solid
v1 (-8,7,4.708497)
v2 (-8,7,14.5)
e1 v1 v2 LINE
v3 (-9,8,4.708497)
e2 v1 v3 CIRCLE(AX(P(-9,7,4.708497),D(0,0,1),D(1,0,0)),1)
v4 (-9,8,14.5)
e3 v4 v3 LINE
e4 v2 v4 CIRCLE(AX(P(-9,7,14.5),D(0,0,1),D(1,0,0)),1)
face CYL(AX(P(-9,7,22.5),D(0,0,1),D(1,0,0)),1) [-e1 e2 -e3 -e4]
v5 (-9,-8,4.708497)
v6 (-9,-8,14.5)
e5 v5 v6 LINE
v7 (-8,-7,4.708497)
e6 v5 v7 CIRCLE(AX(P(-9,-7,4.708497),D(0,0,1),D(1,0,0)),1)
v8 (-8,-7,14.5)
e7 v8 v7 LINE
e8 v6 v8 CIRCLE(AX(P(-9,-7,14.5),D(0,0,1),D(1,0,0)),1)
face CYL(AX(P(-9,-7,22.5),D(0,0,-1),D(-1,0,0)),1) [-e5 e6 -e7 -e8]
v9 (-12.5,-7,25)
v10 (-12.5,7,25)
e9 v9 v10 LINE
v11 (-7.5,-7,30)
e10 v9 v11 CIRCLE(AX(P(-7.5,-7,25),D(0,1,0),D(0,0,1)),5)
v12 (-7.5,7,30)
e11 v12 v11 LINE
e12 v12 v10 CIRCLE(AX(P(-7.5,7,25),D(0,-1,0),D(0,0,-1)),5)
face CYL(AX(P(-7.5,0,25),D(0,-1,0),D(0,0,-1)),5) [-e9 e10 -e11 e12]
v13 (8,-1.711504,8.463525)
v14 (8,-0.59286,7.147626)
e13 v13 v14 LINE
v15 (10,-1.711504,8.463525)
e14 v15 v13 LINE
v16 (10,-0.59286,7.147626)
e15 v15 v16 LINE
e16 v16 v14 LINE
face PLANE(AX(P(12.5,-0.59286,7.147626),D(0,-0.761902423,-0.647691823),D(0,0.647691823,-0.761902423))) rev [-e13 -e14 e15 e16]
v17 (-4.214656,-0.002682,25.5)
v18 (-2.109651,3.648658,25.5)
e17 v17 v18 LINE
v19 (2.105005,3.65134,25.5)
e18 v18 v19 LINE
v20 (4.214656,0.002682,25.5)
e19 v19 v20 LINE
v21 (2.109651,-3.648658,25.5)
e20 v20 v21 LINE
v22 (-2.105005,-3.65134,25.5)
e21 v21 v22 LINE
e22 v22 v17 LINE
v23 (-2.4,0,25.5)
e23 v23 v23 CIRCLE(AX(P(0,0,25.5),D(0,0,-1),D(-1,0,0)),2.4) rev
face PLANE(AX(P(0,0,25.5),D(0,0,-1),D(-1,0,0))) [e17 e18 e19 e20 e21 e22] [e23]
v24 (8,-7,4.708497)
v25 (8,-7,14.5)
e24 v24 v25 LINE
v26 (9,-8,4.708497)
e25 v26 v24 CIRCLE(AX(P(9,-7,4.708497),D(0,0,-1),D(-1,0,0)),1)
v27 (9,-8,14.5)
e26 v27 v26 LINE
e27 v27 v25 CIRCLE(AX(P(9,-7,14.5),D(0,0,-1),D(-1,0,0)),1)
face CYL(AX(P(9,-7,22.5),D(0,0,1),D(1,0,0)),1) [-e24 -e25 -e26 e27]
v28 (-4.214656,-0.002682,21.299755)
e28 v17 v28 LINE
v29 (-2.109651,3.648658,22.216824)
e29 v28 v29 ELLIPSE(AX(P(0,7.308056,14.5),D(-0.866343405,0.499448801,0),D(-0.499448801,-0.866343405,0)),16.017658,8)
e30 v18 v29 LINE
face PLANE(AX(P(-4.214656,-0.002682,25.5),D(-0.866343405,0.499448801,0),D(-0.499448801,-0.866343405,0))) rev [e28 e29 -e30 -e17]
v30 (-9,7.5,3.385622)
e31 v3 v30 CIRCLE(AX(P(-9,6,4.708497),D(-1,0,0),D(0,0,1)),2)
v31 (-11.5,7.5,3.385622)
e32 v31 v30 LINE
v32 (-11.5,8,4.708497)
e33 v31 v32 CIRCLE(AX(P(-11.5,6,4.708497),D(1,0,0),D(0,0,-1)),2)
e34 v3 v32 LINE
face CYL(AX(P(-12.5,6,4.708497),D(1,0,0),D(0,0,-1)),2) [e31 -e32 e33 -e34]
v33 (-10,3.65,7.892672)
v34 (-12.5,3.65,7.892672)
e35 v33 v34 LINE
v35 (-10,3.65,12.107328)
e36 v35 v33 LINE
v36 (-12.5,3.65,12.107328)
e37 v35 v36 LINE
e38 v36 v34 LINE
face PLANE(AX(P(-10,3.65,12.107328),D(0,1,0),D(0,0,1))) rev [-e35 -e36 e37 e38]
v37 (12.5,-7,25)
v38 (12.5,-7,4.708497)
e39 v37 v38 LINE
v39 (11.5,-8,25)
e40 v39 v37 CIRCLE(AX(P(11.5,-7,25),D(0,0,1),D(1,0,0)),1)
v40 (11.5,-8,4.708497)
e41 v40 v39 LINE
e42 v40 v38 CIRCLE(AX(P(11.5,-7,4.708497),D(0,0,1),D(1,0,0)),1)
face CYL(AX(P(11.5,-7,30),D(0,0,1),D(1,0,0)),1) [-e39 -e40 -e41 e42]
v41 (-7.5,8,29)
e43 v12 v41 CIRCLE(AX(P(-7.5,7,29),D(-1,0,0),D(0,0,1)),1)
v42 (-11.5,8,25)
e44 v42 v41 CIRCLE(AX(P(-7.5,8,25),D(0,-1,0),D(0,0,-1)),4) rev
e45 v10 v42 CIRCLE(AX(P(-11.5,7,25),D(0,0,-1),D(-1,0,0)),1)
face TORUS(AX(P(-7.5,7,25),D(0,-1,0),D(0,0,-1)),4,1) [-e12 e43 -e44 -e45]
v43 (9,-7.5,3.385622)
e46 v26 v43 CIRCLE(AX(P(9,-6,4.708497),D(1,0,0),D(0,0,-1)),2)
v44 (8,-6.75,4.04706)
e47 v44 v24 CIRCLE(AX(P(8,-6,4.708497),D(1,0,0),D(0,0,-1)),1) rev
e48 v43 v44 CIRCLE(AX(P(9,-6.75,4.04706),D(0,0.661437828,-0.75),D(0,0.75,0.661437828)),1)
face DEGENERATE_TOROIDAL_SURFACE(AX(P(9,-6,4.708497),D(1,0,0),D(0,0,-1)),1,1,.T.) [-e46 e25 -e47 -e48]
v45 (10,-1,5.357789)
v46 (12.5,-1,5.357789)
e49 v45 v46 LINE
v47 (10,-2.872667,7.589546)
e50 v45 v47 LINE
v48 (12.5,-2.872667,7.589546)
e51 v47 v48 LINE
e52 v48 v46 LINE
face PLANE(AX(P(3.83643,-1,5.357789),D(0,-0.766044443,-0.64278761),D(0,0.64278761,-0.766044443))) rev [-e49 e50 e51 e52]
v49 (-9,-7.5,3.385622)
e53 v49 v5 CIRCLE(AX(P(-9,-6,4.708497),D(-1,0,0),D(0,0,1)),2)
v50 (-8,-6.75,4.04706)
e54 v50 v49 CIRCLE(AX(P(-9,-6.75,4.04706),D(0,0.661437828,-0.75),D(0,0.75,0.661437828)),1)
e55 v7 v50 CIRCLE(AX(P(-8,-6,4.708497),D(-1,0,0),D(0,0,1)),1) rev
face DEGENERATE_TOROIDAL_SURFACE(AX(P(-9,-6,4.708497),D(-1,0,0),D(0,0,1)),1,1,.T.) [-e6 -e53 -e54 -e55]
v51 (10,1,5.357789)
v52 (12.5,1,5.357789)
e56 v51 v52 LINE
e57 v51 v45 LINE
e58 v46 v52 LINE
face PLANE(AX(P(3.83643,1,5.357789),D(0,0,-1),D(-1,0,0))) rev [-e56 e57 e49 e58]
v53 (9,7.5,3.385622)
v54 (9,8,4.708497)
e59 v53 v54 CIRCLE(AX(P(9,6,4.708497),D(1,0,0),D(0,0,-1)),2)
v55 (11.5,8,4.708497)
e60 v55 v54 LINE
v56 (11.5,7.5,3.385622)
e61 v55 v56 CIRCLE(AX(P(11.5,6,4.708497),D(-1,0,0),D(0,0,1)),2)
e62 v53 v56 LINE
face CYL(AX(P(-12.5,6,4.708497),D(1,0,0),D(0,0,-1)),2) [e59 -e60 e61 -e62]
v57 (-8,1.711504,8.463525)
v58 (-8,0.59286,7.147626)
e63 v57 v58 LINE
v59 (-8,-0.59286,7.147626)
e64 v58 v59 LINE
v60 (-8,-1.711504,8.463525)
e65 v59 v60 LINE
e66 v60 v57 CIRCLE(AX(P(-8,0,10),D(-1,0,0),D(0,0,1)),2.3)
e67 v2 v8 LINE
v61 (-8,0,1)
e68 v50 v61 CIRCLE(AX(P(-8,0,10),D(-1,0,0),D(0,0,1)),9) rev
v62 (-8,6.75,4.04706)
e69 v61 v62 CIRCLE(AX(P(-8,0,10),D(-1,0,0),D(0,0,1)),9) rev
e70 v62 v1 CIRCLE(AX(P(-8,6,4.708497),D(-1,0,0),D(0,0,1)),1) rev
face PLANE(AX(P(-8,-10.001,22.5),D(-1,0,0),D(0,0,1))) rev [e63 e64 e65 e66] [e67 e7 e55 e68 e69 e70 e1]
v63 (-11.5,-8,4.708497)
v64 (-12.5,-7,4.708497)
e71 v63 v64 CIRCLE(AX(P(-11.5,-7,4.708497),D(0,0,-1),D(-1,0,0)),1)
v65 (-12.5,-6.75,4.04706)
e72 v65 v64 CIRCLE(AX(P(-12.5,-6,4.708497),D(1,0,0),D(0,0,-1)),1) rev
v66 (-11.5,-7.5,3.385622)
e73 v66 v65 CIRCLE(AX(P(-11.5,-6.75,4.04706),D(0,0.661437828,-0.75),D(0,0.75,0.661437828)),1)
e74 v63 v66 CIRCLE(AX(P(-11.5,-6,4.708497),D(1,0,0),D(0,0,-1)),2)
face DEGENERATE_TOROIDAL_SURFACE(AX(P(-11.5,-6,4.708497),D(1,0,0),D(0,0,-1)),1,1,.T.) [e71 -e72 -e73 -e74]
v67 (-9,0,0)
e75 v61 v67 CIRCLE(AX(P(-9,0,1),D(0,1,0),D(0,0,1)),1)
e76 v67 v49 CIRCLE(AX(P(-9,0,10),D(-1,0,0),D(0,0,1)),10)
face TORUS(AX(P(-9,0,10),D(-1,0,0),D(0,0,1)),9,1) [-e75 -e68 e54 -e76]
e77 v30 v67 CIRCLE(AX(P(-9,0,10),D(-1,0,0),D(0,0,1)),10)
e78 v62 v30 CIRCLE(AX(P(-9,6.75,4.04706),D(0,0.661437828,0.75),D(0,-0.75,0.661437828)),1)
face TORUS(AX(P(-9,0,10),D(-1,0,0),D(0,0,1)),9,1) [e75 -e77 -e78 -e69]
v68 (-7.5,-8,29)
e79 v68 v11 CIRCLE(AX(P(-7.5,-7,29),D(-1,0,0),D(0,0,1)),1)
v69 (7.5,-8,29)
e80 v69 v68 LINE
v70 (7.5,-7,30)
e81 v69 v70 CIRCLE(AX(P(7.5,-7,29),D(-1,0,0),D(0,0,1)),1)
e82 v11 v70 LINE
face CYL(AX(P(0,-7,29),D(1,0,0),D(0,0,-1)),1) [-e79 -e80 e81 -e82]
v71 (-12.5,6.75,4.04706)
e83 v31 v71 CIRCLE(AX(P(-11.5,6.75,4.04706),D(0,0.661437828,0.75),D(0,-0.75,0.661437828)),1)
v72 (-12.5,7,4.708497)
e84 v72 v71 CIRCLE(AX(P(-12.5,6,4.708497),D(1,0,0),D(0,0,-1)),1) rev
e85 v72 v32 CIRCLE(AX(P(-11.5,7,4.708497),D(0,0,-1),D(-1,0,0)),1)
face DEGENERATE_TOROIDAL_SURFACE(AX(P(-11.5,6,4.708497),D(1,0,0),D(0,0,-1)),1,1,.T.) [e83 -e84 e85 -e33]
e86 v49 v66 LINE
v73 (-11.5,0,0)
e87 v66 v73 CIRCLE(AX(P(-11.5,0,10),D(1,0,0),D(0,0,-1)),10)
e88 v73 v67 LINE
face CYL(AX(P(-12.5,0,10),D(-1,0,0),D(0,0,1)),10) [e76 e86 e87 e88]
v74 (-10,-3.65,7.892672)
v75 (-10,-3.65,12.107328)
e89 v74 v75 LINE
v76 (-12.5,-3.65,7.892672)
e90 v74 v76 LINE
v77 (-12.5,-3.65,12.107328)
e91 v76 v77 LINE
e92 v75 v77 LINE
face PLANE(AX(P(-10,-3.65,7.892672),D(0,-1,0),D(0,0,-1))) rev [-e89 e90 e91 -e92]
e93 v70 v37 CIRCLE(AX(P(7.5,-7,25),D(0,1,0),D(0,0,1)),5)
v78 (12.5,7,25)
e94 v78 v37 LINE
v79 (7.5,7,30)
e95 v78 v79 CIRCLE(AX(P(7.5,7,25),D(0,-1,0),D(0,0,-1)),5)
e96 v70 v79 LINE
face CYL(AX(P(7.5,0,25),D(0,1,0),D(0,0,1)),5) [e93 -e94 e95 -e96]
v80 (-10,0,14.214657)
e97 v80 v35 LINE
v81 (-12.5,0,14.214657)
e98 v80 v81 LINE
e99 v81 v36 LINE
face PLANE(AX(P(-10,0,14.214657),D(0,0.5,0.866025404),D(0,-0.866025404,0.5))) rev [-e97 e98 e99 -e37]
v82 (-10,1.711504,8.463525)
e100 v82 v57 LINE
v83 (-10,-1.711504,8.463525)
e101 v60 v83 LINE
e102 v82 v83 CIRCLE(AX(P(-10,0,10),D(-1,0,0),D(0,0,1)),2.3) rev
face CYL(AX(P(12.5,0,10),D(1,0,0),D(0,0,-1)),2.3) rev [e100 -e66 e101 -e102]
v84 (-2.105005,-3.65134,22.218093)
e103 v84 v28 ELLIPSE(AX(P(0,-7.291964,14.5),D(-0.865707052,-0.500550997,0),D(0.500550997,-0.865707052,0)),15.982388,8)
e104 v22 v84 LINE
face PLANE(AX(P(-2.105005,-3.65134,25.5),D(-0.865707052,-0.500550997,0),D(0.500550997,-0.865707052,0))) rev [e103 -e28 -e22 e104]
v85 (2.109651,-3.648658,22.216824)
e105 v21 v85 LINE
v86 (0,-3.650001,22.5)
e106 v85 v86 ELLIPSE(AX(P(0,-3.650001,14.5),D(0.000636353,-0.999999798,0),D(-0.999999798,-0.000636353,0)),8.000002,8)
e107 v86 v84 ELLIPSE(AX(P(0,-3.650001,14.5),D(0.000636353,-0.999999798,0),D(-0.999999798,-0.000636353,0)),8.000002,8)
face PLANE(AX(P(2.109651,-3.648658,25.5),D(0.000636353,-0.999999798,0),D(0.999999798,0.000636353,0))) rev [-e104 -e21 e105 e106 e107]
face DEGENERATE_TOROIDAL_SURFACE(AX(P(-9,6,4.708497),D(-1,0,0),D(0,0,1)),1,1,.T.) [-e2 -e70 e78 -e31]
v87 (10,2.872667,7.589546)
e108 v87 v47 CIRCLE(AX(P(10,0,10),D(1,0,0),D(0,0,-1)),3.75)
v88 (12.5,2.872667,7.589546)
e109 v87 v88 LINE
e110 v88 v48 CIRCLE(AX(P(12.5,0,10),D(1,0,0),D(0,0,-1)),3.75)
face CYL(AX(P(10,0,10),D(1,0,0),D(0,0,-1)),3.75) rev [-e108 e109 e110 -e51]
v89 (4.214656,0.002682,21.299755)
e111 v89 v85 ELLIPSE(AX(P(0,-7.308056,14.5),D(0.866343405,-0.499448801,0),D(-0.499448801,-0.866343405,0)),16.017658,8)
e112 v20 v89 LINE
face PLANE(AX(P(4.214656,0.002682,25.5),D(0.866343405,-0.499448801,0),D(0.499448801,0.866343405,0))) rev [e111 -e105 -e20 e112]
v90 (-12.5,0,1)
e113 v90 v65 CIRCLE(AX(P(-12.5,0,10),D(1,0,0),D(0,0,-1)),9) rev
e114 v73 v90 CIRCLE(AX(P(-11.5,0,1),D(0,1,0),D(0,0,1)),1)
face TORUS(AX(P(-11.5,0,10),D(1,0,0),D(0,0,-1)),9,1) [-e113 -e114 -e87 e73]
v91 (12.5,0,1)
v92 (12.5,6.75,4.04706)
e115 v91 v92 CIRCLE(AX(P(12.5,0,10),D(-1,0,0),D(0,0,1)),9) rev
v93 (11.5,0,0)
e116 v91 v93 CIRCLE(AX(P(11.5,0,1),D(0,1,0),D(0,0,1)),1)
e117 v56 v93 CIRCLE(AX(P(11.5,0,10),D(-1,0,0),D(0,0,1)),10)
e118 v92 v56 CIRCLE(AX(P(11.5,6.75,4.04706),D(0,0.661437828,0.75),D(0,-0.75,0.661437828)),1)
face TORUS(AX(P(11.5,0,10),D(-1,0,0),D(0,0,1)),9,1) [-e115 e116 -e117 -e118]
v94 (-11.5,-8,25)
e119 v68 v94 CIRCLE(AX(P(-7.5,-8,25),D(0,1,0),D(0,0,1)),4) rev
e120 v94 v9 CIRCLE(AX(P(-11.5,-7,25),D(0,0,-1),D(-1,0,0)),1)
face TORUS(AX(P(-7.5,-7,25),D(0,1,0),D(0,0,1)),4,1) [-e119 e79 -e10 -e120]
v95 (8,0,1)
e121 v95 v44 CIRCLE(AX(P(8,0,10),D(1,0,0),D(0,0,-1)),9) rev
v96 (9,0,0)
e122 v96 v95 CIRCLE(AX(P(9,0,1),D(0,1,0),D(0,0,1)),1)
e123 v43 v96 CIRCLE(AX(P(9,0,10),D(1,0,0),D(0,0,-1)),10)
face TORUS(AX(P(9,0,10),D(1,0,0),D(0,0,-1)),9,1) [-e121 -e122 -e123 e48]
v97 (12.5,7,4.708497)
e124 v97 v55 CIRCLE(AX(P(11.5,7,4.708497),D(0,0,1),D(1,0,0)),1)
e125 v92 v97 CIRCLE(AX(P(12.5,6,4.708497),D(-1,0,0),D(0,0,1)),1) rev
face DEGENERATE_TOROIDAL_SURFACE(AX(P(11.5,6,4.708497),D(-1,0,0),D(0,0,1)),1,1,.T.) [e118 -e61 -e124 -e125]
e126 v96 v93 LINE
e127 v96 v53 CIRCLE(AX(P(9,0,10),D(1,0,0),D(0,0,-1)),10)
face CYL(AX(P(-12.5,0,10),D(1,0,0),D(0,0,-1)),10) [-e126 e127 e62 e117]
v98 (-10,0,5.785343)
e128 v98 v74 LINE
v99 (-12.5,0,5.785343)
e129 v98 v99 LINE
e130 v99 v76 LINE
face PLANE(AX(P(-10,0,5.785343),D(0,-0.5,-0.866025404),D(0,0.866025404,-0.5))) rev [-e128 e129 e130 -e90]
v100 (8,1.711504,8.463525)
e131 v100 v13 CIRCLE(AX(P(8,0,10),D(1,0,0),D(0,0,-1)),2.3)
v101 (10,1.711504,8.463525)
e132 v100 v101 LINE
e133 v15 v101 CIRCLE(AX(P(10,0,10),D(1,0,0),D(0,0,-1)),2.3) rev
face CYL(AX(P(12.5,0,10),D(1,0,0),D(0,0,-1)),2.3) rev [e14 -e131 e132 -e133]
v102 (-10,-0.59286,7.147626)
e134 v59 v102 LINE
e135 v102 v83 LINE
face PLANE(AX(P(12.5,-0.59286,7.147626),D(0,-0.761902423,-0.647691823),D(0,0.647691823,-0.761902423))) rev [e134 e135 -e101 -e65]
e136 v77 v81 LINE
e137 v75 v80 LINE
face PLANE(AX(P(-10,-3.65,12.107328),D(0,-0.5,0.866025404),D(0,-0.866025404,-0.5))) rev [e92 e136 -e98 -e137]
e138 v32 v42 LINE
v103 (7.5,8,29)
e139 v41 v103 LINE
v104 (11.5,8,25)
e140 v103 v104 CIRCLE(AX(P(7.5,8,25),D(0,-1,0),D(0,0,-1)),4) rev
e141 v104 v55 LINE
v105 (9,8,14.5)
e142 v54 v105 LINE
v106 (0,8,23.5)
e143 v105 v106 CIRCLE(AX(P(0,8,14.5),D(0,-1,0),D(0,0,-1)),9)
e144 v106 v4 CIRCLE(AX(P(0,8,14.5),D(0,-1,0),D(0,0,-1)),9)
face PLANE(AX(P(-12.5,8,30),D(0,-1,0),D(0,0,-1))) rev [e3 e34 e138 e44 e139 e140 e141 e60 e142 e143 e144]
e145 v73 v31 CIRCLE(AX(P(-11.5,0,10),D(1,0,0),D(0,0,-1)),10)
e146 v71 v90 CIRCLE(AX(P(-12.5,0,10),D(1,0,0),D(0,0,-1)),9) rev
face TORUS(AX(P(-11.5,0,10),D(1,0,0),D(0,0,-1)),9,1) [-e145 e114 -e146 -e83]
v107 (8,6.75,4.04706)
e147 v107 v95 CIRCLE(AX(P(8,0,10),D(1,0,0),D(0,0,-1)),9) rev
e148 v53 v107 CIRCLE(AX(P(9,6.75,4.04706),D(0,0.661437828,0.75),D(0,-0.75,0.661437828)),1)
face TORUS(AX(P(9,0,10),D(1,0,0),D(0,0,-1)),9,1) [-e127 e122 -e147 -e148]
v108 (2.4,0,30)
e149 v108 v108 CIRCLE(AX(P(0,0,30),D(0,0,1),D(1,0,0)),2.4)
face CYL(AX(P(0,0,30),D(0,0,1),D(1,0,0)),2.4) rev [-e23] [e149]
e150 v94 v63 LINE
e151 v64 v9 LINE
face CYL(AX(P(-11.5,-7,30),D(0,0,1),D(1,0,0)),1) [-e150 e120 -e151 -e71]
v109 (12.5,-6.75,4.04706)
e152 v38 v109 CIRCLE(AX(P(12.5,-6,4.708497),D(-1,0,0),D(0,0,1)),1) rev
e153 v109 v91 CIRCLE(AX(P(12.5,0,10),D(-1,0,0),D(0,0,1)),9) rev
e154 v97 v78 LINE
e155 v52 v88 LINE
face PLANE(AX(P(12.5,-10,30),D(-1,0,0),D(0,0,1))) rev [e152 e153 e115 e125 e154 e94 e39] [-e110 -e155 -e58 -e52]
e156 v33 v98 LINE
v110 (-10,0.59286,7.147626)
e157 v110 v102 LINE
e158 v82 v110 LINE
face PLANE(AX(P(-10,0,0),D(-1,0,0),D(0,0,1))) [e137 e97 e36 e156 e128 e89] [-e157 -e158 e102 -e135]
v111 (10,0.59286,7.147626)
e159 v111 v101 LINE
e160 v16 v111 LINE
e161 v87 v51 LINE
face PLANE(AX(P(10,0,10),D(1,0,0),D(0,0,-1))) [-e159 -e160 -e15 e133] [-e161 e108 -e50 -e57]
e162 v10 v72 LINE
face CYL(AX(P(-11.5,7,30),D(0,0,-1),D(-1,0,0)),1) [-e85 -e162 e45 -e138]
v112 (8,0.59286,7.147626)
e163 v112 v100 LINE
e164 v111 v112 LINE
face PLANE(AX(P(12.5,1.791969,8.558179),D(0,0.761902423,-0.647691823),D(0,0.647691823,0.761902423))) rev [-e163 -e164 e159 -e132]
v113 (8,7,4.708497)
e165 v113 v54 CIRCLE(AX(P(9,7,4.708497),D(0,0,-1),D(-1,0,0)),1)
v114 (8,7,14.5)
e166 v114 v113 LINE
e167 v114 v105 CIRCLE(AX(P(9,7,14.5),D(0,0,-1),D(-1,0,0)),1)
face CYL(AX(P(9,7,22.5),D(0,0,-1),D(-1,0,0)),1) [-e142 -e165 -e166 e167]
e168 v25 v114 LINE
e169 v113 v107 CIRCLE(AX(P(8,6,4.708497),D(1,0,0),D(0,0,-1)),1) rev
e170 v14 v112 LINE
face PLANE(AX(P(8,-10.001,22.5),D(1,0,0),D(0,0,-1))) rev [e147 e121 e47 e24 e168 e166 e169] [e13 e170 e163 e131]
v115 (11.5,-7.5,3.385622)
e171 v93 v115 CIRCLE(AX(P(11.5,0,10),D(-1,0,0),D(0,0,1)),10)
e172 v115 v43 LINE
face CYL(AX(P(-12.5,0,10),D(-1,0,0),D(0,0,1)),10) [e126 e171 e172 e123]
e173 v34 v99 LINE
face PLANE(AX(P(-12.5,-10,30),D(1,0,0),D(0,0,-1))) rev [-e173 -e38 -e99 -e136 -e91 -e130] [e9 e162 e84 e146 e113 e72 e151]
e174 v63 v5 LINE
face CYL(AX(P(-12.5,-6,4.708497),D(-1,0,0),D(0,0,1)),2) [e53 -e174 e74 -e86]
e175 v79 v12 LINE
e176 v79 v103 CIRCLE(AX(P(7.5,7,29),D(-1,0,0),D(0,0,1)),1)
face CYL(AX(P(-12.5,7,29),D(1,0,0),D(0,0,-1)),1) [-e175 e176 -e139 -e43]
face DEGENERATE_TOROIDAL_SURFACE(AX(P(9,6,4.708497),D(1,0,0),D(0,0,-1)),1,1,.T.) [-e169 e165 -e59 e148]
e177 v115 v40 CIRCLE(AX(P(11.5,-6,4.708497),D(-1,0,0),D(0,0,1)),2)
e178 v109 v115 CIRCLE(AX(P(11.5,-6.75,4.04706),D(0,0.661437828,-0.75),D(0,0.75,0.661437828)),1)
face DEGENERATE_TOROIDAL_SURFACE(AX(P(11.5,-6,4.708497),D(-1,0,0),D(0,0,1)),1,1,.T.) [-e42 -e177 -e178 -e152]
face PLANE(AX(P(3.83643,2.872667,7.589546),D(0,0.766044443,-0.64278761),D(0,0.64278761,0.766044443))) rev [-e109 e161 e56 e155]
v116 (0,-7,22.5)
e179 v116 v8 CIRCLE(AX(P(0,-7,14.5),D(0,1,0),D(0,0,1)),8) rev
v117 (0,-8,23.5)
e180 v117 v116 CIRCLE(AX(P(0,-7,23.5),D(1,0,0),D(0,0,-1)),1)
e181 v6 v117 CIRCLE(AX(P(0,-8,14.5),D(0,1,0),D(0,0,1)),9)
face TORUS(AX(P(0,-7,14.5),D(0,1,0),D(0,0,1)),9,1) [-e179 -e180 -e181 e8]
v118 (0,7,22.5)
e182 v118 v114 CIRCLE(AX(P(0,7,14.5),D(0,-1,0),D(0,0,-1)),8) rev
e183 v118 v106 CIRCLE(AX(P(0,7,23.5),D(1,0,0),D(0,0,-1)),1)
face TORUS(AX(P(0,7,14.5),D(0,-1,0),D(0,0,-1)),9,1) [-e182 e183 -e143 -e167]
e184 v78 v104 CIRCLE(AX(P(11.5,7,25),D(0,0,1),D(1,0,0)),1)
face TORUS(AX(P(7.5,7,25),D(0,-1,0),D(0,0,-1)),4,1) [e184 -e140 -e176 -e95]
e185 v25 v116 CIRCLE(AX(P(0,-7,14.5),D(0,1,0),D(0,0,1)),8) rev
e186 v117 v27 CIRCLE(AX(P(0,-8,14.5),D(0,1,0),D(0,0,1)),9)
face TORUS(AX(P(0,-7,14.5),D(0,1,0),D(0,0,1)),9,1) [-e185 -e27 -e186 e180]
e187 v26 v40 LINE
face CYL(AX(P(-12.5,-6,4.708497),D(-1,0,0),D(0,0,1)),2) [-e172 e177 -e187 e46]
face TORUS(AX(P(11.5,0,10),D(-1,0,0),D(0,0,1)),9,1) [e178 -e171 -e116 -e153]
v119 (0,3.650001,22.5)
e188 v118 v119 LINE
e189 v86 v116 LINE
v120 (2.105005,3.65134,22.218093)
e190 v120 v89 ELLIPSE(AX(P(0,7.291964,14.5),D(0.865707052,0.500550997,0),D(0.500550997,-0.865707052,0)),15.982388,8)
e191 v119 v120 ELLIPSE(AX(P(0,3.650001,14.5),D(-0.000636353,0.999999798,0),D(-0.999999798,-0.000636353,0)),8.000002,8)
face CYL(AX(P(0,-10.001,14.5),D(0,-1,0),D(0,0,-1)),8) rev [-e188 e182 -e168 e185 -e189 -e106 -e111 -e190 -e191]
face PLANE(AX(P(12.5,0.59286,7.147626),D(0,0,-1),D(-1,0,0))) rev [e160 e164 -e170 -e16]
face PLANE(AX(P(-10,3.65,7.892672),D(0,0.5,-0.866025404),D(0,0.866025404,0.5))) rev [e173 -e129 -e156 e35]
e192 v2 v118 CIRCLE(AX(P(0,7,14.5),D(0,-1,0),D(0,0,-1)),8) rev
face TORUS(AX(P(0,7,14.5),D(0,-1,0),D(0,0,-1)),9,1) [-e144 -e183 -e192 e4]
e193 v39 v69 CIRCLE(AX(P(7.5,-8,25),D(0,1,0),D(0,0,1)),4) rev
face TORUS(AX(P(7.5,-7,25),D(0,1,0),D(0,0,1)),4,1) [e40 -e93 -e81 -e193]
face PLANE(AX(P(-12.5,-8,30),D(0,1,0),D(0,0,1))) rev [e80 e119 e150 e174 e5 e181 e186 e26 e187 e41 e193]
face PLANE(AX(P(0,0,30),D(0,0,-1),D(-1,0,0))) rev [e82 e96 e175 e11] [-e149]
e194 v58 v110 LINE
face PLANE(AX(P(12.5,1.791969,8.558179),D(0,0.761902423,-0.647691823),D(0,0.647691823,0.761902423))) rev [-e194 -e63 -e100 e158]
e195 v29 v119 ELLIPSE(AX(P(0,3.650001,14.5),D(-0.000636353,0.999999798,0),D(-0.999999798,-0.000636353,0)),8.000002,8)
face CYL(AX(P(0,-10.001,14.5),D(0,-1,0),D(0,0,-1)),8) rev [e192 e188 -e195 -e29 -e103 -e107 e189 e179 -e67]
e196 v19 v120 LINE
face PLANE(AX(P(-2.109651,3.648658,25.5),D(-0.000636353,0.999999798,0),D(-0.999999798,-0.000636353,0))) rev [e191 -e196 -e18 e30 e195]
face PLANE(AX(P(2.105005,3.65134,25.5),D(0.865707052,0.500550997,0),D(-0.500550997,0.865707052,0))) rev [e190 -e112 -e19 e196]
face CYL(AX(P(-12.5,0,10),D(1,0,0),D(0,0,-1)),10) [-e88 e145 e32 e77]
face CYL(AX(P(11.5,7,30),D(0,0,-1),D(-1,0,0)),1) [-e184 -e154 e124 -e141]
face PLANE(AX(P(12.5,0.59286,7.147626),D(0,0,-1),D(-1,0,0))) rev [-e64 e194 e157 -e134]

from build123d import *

# Parameters (mm, degrees)
CROQUIS1_W                   = 25
CROQUIS1_H                   = 20
SALIENTE_EXTRUIR1_DEPTH      = 30
CORTAR_EXTRUIR1_REACH        = 40.161
CROQUIS2_W                   = 16
CROQUIS2_H                   = 45
TALADRO_DE_MARGEN_PARA_M51_D = 4.6
CROQUIS8_R                   = 3.75
CORTAR_EXTRUIR4_DEPTH        = 2.5
CORTAR_EXTRUIR5_DEPTH        = 2.5
TALADRO_DE_MARGEN_PARA_M52_D = 4.8
CORTAR_EXTRUIR6_DEPTH        = 3
REDONDEO1_R                  = 10
REDONDEO2_R                  = 5
REDONDEO3_R                  = 8
CORTAR_EXTRUIR7_DEPTH        = 39.810436741
CORTAR_EXTRUIR8_DEPTH        = 2.5
CORTAR_EXTRUIR9_START        = -10
CORTAR_EXTRUIR9_DEPTH        = 2
CORTAR_EXTRUIR9_START_2      = 8
CORTAR_EXTRUIR9_2_DEPTH      = 2
REDONDEO4_R                  = 2
REDONDEO5_R                  = 1


# Read off the part's stored shape, not the designer's step: Cortar-Extruir9
# Some blends are built 0.0001 mm under size
with BuildPart() as part:
    # Croquis1 → Saliente-Extruir1 (new body)
    with BuildSketch(Plane.XY):
        Rectangle(CROQUIS1_W, CROQUIS1_H)
    extrude(amount=SALIENTE_EXTRUIR1_DEPTH)

    # Croquis2 → Cortar-Extruir1 (cut, up to next)
    with BuildSketch(Plane(origin=(0, 10, 0), x_dir=(1, 0, 0), z_dir=(0, 1, 0)), mode=Mode.PRIVATE) as cortar_extruir1_sk1:
        Rectangle(CROQUIS2_W, CROQUIS2_H)
    cortar_extruir1_tool1 = extrude(cortar_extruir1_sk1.sketch, amount=-CORTAR_EXTRUIR1_REACH, mode=Mode.PRIVATE) & part.part
    add(cortar_extruir1_tool1.solids().sort_by_distance((0, 10, 0))[0], mode=Mode.SUBTRACT)

    # Taladro de margen para M51 (through all)
    with Locations(Plane(origin=(12.5, 0, 0), x_dir=(0, 0, -1), z_dir=(1, 0, 0))):
        with Locations((-10, 0)):
            Hole(TALADRO_DE_MARGEN_PARA_M51_D / 2)

    # Croquis8 → Cortar-Extruir4 (cut)
    with BuildSketch(Plane(origin=(12.5, 0, 0), x_dir=(0, 0, -1), z_dir=(1, 0, 0))):
        with Locations((-10, 0)):
            Circle(CROQUIS8_R)
    extrude(amount=-CORTAR_EXTRUIR4_DEPTH, mode=Mode.SUBTRACT)

    # Croquis9 → Cortar-Extruir5 (cut)
    with BuildSketch(Plane.ZY.offset(12.5)):
        Polygon((5.785343035, 0), (7.892671517, -3.65), (12.107328483, -3.65), (14.214656965, 0), (12.107328483, 3.65), (7.892671517, 3.65), align=None)
    extrude(amount=-CORTAR_EXTRUIR5_DEPTH, mode=Mode.SUBTRACT)

    # Taladro de margen para M52 (through all)
    with Locations(Plane.XY.offset(30)):
        with Locations((0, 0)):
            Hole(TALADRO_DE_MARGEN_PARA_M52_D / 2)

    # Croquis13 → Cortar-Extruir6 (cut)
    with BuildSketch(Plane(origin=(0, 0, 22.5), x_dir=(-1, 0, 0), z_dir=(0, 0, -1))):
        Polygon((2.109650745, 3.648658256), (-2.105005367, 3.651340266), (-4.214656112, 0.00268201), (-2.109650745, -3.648658256), (2.105005367, -3.651340266), (4.214656112, -0.00268201), align=None)
    extrude(amount=-CORTAR_EXTRUIR6_DEPTH, mode=Mode.SUBTRACT)

    # Redondeo1
    redondeo1_edges = [part.edges().sort_by_distance(p)[0] for p in [
        (-10.25, -10, 0),
        (-10.25, 10, 0),
        (10.25, -10, 0),
        (10.25, 10, 0),
    ]]
    fillet(redondeo1_edges, radius=REDONDEO1_R - 0.0001)  # a hair under: the kernel refuses the full size

    # Redondeo2
    redondeo2_edges = [part.edges().sort_by_distance(p)[0] for p in [
        (-12.5, 0, 30),
        (12.5, 0, 30),
    ]]
    fillet(redondeo2_edges, radius=REDONDEO2_R)

    # Redondeo3
    # the kernel refuses this fillet: 8 mm, written as the material it adds along each edge
    with BuildSketch(Plane(origin=(-8, 10, 22.5), x_dir=(0, 0, -1), z_dir=(0, -1, 0))) as redondeo3_piece_1_section:
        with BuildLine():
            CenterArc((REDONDEO3_R, REDONDEO3_R), REDONDEO3_R, 180, 90)
            Line((0, REDONDEO3_R), (0, 0))
            Line((0, 0), (REDONDEO3_R, 0))
        make_face()
    redondeo3_piece_1 = extrude(amount=40, mode=Mode.PRIVATE)
    redondeo3_piece_1 = split(redondeo3_piece_1, bisect_by=Plane(origin=(-1.542701741, 4.632087449, 20.877990823), z_dir=(-0.8663434050364778, 0.49944880072916537, 0)), keep=Keep.TOP, mode=Mode.PRIVATE)
    add(redondeo3_piece_1)
    with BuildSketch(Plane(origin=(-8, 30, 22.5), x_dir=(0, 0, -1), z_dir=(0, -1, 0))) as redondeo3_piece_2_section:
        with BuildLine():
            CenterArc((REDONDEO3_R, REDONDEO3_R), REDONDEO3_R, 180, 90)
            Line((0, REDONDEO3_R), (0, 0))
            Line((0, 0), (REDONDEO3_R, 0))
        make_face()
    redondeo3_piece_2 = extrude(amount=60, mode=Mode.PRIVATE)
    redondeo3_piece_2 = split(redondeo3_piece_2, bisect_by=Plane(origin=(-1.583425809, 4.561447519, 22.44370091), z_dir=(0.8663434050364778, -0.49944880072916537, 0)), keep=Keep.TOP, mode=Mode.PRIVATE)
    redondeo3_piece_2 = split(redondeo3_piece_2, bisect_by=Plane(origin=(-1.267040589, 3.649194454, 22.44370091), z_dir=(-0.0006363531971100188, 0.9999997975272839, 0)), keep=Keep.TOP, mode=Mode.PRIVATE)
    add(redondeo3_piece_2)
    with BuildSketch(Plane(origin=(-8, 30, 22.5), x_dir=(0, 0, -1), z_dir=(0, -1, 0))) as redondeo3_piece_3_section:
        with BuildLine():
            CenterArc((REDONDEO3_R, REDONDEO3_R), REDONDEO3_R, 180, 90)
            Line((0, REDONDEO3_R), (0, 0))
            Line((0, 0), (REDONDEO3_R, 0))
        make_face()
    redondeo3_piece_3 = extrude(amount=40, mode=Mode.PRIVATE)
    redondeo3_piece_3 = split(redondeo3_piece_3, bisect_by=Plane(origin=(-1.265169081, -3.650805834, 22.443951569), z_dir=(0.0006363531971099136, -0.9999997975272839, 0)), keep=Keep.TOP, mode=Mode.PRIVATE)
    add(redondeo3_piece_3)
    with BuildSketch(Plane(origin=(-8, 30, 22.5), x_dir=(0, 0, -1), z_dir=(0, -1, 0))) as redondeo3_piece_4_section:
        with BuildLine():
            CenterArc((REDONDEO3_R, REDONDEO3_R), REDONDEO3_R, 180, 90)
            Line((0, REDONDEO3_R), (0, 0))
            Line((0, 0), (REDONDEO3_R, 0))
        make_face()
    redondeo3_piece_4 = extrude(amount=60, mode=Mode.PRIVATE)
    redondeo3_piece_4 = split(redondeo3_piece_4, bisect_by=Plane(origin=(-3.239385645, -1.689420276, 21.740409099), z_dir=(-0.865707051839368, -0.5005509967981187, 0)), keep=Keep.TOP, mode=Mode.PRIVATE)
    redondeo3_piece_4 = split(redondeo3_piece_4, bisect_by=Plane(origin=(-4.581718949, -3.652916331, 21.740409099), z_dir=(-0.0006363531971099136, 0.9999997975272839, 0)), keep=Keep.TOP, mode=Mode.PRIVATE)
    add(redondeo3_piece_4)
    with BuildSketch(Plane(origin=(8, 10, 22.5), x_dir=(-1, 0, 0), z_dir=(0, -1, 0))) as redondeo3_piece_5_section:
        with BuildLine():
            CenterArc((REDONDEO3_R, REDONDEO3_R), REDONDEO3_R, 180, 90)
            Line((0, REDONDEO3_R), (0, 0))
            Line((0, 0), (REDONDEO3_R, 0))
        make_face()
    redondeo3_piece_5 = extrude(amount=40, mode=Mode.PRIVATE)
    redondeo3_piece_5 = split(redondeo3_piece_5, bisect_by=Plane(origin=(1.539300271, 4.629731866, 20.879744511), z_dir=(0.8657070518393678, 0.5005509967981188, 0)), keep=Keep.TOP, mode=Mode.PRIVATE)
    add(redondeo3_piece_5)
    with BuildSketch(Plane(origin=(8, 30, 22.5), x_dir=(-1, 0, 0), z_dir=(0, -1, 0))) as redondeo3_piece_6_section:
        with BuildLine():
            CenterArc((REDONDEO3_R, REDONDEO3_R), REDONDEO3_R, 180, 90)
            Line((0, REDONDEO3_R), (0, 0))
            Line((0, 0), (REDONDEO3_R, 0))
        make_face()
    redondeo3_piece_6 = extrude(amount=60, mode=Mode.PRIVATE)
    redondeo3_piece_6 = split(redondeo3_piece_6, bisect_by=Plane(origin=(1.579702806, 4.559855351, 22.443951569), z_dir=(-0.8657070518393678, -0.5005509967981188, 0)), keep=Keep.TOP, mode=Mode.PRIVATE)
    redondeo3_piece_6 = split(redondeo3_piece_6, bisect_by=Plane(origin=(1.265169081, 3.650805834, 22.443951569), z_dir=(-0.0006363531971100188, 0.9999997975272839, 0)), keep=Keep.TOP, mode=Mode.PRIVATE)
    add(redondeo3_piece_6)
    with BuildSketch(Plane(origin=(8, 30, 22.5), x_dir=(-1, 0, 0), z_dir=(0, -1, 0))) as redondeo3_piece_7_section:
        with BuildLine():
            CenterArc((REDONDEO3_R, REDONDEO3_R), REDONDEO3_R, 180, 90)
            Line((0, REDONDEO3_R), (0, 0))
            Line((0, 0), (REDONDEO3_R, 0))
        make_face()
    redondeo3_piece_7 = extrude(amount=40, mode=Mode.PRIVATE)
    redondeo3_piece_7 = split(redondeo3_piece_7, bisect_by=Plane(origin=(3.24131014, -1.685682967, 21.739264783), z_dir=(0.8663434050364778, -0.49944880072916537, 0)), keep=Keep.TOP, mode=Mode.PRIVATE)
    add(redondeo3_piece_7)
    with BuildSketch(Plane(origin=(8, 30, 22.5), x_dir=(-1, 0, 0), z_dir=(0, -1, 0))) as redondeo3_piece_8_section:
        with BuildLine():
            CenterArc((REDONDEO3_R, REDONDEO3_R), REDONDEO3_R, 180, 90)
            Line((0, REDONDEO3_R), (0, 0))
            Line((0, 0), (REDONDEO3_R, 0))
        make_face()
    redondeo3_piece_8 = extrude(amount=60, mode=Mode.PRIVATE)
    redondeo3_piece_8 = split(redondeo3_piece_8, bisect_by=Plane(origin=(1.267040588, -3.649194454, 22.44370091), z_dir=(0.0006363531971099136, -0.9999997975272839, 0)), keep=Keep.TOP, mode=Mode.PRIVATE)
    redondeo3_piece_8 = split(redondeo3_piece_8, bisect_by=Plane(origin=(1.583425809, -4.561447518, 22.44370091), z_dir=(-0.8663434050364778, 0.49944880072916537, 0)), keep=Keep.TOP, mode=Mode.PRIVATE)
    add(redondeo3_piece_8)

    # Croquis14 → Cortar-Extruir7 (cut, through all)
    with BuildSketch(Plane.ZY.offset(10)):
        Polygon((8.558178994, 1.791968801), (7.1476261, 0.592860429), (7.1476261, -0.592860429), (8.558178994, -1.791968801), align=None)
    extrude(amount=-CORTAR_EXTRUIR7_DEPTH, mode=Mode.SUBTRACT)

    # Croquis15 → Cortar-Extruir8 (cut)
    with BuildSketch(Plane(origin=(12.5, 0, 0), x_dir=(0, 0, -1), z_dir=(1, 0, 0))):
        with BuildLine():
            Line((-7.589546464, 2.872666662), (-5.357789242, 1))
            Line((-5.357789242, 1), (-5.357789242, -1))
            Line((-5.357789242, -1), (-7.589546464, -2.872666662))
            ThreePointArc((-7.589546464, -2.872666662), (-6.25, 0), (-7.589546464, 2.872666662))
        make_face()
    extrude(amount=-CORTAR_EXTRUIR8_DEPTH, mode=Mode.SUBTRACT)

    # Cortar-Extruir9 outline → Cortar-Extruir9 (cut)
    with BuildSketch(Plane(origin=(0, 0, 0), x_dir=(1, 0, 0), z_dir=(0, 1, 0)).offset(CORTAR_EXTRUIR9_START)):
        with BuildLine():
            Line((12.5, -25), (12.5, -3))
            Line((12.5, -3), (8, -3))
            Line((8, -3), (8, -14.5))
            ThreePointArc((8, -14.5), (5.656854249, -20.156854249), (0, -22.5))
            ThreePointArc((0, -22.5), (-5.656854249, -20.156854249), (-8, -14.5))
            Line((-8, -14.5), (-8, -3))
            Line((-8, -3), (-12.5, -3))
            Line((-12.5, -3), (-12.5, -25))
            ThreePointArc((-12.5, -25), (-11.035533906, -28.535533906), (-7.5, -30))
            Line((-7.5, -30), (7.5, -30))
            ThreePointArc((7.5, -30), (11.035533906, -28.535533906), (12.5, -25))
        make_face()
    extrude(amount=CORTAR_EXTRUIR9_DEPTH, mode=Mode.SUBTRACT)

    # Cortar-Extruir9 2 outline → Cortar-Extruir9 2 (cut)
    with BuildSketch(Plane(origin=(0, 0, 0), x_dir=(1, 0, 0), z_dir=(0, 1, 0)).offset(CORTAR_EXTRUIR9_START_2)):
        with BuildLine():
            Line((12.5, -25), (12.5, -3))
            Line((12.5, -3), (8, -3))
            Line((8, -3), (8, -14.5))
            ThreePointArc((8, -14.5), (5.656854249, -20.156854249), (0, -22.5))
            ThreePointArc((0, -22.5), (-5.656854249, -20.156854249), (-8, -14.5))
            Line((-8, -14.5), (-8, -3))
            Line((-8, -3), (-12.5, -3))
            Line((-12.5, -3), (-12.5, -25))
            ThreePointArc((-12.5, -25), (-11.035533906, -28.535533906), (-7.5, -30))
            Line((-7.5, -30), (7.5, -30))
            ThreePointArc((7.5, -30), (11.035533906, -28.535533906), (12.5, -25))
        make_face()
    extrude(amount=CORTAR_EXTRUIR9_2_DEPTH, mode=Mode.SUBTRACT)

    # Redondeo4
    redondeo4_edges = [part.edges().sort_by_distance(p)[0] for p in [
        (-10.25, 8, 3.999933333),
        (10.25, 8, 3.999933333),
        (10.25, -8, 3.999933333),
        (-10.25, -8, 3.999933333),
    ]]
    fillet(redondeo4_edges, radius=REDONDEO4_R)

    # Redondeo5
    redondeo5_edges = [part.edges().sort_by_distance(p)[0] for p in [
        (-5.656854249, 8, 20.156854249),
        (12.5, 8, 14.854217587),
        (11.035533906, 8, 28.535533906),
        (-11.035533906, 8, 28.535533906),
        (-12.5, 8, 14.854217587),
        (5.656854249, 8, 20.156854249),
        (8, 8, 9.604217587),
        (0, 8, 30),
        (-5.656854249, -8, 20.156854249),
        (11.035533906, -8, 28.535533906),
        (-11.035533906, -8, 28.535533906),
        (5.656854249, -8, 20.156854249),
        (-8, -8, 9.604217587),
        (0, -8, 30),
        (-12.5, -8, 14.854217587),
        (8, -8, 9.604217587),
        (12.5, -8, 14.854217587),
        (12.5, -4.114415603, 0.885603147),
        (12.5, 7.870827023, 4.001323974),
        (12.5, -7.870827023, 4.001323974),
        (8, 4.114415603, 0.885603147),
        (8, 7.870827023, 4.001323974),
        (8, -7.870827023, 4.001323974),
        (-8, -4.114415603, 0.885603147),
        (-8, 8, 9.604217587),
        (-8, 7.870827023, 4.001323974),
        (-8, -7.870827023, 4.001323974),
        (-12.5, 4.114415603, 0.885603147),
        (-12.5, 7.870827023, 4.001323974),
        (-12.5, -7.870827023, 4.001323974),
        (-8, 4.114415603, 0.885603147),
        (-12.5, -4.114415603, 0.885603147),
        (12.5, 4.114415603, 0.885603147),
        (8, -4.114415603, 0.885603147),
    ]]
    fillet(redondeo5_edges, radius=REDONDEO5_R)


solid = part.part
